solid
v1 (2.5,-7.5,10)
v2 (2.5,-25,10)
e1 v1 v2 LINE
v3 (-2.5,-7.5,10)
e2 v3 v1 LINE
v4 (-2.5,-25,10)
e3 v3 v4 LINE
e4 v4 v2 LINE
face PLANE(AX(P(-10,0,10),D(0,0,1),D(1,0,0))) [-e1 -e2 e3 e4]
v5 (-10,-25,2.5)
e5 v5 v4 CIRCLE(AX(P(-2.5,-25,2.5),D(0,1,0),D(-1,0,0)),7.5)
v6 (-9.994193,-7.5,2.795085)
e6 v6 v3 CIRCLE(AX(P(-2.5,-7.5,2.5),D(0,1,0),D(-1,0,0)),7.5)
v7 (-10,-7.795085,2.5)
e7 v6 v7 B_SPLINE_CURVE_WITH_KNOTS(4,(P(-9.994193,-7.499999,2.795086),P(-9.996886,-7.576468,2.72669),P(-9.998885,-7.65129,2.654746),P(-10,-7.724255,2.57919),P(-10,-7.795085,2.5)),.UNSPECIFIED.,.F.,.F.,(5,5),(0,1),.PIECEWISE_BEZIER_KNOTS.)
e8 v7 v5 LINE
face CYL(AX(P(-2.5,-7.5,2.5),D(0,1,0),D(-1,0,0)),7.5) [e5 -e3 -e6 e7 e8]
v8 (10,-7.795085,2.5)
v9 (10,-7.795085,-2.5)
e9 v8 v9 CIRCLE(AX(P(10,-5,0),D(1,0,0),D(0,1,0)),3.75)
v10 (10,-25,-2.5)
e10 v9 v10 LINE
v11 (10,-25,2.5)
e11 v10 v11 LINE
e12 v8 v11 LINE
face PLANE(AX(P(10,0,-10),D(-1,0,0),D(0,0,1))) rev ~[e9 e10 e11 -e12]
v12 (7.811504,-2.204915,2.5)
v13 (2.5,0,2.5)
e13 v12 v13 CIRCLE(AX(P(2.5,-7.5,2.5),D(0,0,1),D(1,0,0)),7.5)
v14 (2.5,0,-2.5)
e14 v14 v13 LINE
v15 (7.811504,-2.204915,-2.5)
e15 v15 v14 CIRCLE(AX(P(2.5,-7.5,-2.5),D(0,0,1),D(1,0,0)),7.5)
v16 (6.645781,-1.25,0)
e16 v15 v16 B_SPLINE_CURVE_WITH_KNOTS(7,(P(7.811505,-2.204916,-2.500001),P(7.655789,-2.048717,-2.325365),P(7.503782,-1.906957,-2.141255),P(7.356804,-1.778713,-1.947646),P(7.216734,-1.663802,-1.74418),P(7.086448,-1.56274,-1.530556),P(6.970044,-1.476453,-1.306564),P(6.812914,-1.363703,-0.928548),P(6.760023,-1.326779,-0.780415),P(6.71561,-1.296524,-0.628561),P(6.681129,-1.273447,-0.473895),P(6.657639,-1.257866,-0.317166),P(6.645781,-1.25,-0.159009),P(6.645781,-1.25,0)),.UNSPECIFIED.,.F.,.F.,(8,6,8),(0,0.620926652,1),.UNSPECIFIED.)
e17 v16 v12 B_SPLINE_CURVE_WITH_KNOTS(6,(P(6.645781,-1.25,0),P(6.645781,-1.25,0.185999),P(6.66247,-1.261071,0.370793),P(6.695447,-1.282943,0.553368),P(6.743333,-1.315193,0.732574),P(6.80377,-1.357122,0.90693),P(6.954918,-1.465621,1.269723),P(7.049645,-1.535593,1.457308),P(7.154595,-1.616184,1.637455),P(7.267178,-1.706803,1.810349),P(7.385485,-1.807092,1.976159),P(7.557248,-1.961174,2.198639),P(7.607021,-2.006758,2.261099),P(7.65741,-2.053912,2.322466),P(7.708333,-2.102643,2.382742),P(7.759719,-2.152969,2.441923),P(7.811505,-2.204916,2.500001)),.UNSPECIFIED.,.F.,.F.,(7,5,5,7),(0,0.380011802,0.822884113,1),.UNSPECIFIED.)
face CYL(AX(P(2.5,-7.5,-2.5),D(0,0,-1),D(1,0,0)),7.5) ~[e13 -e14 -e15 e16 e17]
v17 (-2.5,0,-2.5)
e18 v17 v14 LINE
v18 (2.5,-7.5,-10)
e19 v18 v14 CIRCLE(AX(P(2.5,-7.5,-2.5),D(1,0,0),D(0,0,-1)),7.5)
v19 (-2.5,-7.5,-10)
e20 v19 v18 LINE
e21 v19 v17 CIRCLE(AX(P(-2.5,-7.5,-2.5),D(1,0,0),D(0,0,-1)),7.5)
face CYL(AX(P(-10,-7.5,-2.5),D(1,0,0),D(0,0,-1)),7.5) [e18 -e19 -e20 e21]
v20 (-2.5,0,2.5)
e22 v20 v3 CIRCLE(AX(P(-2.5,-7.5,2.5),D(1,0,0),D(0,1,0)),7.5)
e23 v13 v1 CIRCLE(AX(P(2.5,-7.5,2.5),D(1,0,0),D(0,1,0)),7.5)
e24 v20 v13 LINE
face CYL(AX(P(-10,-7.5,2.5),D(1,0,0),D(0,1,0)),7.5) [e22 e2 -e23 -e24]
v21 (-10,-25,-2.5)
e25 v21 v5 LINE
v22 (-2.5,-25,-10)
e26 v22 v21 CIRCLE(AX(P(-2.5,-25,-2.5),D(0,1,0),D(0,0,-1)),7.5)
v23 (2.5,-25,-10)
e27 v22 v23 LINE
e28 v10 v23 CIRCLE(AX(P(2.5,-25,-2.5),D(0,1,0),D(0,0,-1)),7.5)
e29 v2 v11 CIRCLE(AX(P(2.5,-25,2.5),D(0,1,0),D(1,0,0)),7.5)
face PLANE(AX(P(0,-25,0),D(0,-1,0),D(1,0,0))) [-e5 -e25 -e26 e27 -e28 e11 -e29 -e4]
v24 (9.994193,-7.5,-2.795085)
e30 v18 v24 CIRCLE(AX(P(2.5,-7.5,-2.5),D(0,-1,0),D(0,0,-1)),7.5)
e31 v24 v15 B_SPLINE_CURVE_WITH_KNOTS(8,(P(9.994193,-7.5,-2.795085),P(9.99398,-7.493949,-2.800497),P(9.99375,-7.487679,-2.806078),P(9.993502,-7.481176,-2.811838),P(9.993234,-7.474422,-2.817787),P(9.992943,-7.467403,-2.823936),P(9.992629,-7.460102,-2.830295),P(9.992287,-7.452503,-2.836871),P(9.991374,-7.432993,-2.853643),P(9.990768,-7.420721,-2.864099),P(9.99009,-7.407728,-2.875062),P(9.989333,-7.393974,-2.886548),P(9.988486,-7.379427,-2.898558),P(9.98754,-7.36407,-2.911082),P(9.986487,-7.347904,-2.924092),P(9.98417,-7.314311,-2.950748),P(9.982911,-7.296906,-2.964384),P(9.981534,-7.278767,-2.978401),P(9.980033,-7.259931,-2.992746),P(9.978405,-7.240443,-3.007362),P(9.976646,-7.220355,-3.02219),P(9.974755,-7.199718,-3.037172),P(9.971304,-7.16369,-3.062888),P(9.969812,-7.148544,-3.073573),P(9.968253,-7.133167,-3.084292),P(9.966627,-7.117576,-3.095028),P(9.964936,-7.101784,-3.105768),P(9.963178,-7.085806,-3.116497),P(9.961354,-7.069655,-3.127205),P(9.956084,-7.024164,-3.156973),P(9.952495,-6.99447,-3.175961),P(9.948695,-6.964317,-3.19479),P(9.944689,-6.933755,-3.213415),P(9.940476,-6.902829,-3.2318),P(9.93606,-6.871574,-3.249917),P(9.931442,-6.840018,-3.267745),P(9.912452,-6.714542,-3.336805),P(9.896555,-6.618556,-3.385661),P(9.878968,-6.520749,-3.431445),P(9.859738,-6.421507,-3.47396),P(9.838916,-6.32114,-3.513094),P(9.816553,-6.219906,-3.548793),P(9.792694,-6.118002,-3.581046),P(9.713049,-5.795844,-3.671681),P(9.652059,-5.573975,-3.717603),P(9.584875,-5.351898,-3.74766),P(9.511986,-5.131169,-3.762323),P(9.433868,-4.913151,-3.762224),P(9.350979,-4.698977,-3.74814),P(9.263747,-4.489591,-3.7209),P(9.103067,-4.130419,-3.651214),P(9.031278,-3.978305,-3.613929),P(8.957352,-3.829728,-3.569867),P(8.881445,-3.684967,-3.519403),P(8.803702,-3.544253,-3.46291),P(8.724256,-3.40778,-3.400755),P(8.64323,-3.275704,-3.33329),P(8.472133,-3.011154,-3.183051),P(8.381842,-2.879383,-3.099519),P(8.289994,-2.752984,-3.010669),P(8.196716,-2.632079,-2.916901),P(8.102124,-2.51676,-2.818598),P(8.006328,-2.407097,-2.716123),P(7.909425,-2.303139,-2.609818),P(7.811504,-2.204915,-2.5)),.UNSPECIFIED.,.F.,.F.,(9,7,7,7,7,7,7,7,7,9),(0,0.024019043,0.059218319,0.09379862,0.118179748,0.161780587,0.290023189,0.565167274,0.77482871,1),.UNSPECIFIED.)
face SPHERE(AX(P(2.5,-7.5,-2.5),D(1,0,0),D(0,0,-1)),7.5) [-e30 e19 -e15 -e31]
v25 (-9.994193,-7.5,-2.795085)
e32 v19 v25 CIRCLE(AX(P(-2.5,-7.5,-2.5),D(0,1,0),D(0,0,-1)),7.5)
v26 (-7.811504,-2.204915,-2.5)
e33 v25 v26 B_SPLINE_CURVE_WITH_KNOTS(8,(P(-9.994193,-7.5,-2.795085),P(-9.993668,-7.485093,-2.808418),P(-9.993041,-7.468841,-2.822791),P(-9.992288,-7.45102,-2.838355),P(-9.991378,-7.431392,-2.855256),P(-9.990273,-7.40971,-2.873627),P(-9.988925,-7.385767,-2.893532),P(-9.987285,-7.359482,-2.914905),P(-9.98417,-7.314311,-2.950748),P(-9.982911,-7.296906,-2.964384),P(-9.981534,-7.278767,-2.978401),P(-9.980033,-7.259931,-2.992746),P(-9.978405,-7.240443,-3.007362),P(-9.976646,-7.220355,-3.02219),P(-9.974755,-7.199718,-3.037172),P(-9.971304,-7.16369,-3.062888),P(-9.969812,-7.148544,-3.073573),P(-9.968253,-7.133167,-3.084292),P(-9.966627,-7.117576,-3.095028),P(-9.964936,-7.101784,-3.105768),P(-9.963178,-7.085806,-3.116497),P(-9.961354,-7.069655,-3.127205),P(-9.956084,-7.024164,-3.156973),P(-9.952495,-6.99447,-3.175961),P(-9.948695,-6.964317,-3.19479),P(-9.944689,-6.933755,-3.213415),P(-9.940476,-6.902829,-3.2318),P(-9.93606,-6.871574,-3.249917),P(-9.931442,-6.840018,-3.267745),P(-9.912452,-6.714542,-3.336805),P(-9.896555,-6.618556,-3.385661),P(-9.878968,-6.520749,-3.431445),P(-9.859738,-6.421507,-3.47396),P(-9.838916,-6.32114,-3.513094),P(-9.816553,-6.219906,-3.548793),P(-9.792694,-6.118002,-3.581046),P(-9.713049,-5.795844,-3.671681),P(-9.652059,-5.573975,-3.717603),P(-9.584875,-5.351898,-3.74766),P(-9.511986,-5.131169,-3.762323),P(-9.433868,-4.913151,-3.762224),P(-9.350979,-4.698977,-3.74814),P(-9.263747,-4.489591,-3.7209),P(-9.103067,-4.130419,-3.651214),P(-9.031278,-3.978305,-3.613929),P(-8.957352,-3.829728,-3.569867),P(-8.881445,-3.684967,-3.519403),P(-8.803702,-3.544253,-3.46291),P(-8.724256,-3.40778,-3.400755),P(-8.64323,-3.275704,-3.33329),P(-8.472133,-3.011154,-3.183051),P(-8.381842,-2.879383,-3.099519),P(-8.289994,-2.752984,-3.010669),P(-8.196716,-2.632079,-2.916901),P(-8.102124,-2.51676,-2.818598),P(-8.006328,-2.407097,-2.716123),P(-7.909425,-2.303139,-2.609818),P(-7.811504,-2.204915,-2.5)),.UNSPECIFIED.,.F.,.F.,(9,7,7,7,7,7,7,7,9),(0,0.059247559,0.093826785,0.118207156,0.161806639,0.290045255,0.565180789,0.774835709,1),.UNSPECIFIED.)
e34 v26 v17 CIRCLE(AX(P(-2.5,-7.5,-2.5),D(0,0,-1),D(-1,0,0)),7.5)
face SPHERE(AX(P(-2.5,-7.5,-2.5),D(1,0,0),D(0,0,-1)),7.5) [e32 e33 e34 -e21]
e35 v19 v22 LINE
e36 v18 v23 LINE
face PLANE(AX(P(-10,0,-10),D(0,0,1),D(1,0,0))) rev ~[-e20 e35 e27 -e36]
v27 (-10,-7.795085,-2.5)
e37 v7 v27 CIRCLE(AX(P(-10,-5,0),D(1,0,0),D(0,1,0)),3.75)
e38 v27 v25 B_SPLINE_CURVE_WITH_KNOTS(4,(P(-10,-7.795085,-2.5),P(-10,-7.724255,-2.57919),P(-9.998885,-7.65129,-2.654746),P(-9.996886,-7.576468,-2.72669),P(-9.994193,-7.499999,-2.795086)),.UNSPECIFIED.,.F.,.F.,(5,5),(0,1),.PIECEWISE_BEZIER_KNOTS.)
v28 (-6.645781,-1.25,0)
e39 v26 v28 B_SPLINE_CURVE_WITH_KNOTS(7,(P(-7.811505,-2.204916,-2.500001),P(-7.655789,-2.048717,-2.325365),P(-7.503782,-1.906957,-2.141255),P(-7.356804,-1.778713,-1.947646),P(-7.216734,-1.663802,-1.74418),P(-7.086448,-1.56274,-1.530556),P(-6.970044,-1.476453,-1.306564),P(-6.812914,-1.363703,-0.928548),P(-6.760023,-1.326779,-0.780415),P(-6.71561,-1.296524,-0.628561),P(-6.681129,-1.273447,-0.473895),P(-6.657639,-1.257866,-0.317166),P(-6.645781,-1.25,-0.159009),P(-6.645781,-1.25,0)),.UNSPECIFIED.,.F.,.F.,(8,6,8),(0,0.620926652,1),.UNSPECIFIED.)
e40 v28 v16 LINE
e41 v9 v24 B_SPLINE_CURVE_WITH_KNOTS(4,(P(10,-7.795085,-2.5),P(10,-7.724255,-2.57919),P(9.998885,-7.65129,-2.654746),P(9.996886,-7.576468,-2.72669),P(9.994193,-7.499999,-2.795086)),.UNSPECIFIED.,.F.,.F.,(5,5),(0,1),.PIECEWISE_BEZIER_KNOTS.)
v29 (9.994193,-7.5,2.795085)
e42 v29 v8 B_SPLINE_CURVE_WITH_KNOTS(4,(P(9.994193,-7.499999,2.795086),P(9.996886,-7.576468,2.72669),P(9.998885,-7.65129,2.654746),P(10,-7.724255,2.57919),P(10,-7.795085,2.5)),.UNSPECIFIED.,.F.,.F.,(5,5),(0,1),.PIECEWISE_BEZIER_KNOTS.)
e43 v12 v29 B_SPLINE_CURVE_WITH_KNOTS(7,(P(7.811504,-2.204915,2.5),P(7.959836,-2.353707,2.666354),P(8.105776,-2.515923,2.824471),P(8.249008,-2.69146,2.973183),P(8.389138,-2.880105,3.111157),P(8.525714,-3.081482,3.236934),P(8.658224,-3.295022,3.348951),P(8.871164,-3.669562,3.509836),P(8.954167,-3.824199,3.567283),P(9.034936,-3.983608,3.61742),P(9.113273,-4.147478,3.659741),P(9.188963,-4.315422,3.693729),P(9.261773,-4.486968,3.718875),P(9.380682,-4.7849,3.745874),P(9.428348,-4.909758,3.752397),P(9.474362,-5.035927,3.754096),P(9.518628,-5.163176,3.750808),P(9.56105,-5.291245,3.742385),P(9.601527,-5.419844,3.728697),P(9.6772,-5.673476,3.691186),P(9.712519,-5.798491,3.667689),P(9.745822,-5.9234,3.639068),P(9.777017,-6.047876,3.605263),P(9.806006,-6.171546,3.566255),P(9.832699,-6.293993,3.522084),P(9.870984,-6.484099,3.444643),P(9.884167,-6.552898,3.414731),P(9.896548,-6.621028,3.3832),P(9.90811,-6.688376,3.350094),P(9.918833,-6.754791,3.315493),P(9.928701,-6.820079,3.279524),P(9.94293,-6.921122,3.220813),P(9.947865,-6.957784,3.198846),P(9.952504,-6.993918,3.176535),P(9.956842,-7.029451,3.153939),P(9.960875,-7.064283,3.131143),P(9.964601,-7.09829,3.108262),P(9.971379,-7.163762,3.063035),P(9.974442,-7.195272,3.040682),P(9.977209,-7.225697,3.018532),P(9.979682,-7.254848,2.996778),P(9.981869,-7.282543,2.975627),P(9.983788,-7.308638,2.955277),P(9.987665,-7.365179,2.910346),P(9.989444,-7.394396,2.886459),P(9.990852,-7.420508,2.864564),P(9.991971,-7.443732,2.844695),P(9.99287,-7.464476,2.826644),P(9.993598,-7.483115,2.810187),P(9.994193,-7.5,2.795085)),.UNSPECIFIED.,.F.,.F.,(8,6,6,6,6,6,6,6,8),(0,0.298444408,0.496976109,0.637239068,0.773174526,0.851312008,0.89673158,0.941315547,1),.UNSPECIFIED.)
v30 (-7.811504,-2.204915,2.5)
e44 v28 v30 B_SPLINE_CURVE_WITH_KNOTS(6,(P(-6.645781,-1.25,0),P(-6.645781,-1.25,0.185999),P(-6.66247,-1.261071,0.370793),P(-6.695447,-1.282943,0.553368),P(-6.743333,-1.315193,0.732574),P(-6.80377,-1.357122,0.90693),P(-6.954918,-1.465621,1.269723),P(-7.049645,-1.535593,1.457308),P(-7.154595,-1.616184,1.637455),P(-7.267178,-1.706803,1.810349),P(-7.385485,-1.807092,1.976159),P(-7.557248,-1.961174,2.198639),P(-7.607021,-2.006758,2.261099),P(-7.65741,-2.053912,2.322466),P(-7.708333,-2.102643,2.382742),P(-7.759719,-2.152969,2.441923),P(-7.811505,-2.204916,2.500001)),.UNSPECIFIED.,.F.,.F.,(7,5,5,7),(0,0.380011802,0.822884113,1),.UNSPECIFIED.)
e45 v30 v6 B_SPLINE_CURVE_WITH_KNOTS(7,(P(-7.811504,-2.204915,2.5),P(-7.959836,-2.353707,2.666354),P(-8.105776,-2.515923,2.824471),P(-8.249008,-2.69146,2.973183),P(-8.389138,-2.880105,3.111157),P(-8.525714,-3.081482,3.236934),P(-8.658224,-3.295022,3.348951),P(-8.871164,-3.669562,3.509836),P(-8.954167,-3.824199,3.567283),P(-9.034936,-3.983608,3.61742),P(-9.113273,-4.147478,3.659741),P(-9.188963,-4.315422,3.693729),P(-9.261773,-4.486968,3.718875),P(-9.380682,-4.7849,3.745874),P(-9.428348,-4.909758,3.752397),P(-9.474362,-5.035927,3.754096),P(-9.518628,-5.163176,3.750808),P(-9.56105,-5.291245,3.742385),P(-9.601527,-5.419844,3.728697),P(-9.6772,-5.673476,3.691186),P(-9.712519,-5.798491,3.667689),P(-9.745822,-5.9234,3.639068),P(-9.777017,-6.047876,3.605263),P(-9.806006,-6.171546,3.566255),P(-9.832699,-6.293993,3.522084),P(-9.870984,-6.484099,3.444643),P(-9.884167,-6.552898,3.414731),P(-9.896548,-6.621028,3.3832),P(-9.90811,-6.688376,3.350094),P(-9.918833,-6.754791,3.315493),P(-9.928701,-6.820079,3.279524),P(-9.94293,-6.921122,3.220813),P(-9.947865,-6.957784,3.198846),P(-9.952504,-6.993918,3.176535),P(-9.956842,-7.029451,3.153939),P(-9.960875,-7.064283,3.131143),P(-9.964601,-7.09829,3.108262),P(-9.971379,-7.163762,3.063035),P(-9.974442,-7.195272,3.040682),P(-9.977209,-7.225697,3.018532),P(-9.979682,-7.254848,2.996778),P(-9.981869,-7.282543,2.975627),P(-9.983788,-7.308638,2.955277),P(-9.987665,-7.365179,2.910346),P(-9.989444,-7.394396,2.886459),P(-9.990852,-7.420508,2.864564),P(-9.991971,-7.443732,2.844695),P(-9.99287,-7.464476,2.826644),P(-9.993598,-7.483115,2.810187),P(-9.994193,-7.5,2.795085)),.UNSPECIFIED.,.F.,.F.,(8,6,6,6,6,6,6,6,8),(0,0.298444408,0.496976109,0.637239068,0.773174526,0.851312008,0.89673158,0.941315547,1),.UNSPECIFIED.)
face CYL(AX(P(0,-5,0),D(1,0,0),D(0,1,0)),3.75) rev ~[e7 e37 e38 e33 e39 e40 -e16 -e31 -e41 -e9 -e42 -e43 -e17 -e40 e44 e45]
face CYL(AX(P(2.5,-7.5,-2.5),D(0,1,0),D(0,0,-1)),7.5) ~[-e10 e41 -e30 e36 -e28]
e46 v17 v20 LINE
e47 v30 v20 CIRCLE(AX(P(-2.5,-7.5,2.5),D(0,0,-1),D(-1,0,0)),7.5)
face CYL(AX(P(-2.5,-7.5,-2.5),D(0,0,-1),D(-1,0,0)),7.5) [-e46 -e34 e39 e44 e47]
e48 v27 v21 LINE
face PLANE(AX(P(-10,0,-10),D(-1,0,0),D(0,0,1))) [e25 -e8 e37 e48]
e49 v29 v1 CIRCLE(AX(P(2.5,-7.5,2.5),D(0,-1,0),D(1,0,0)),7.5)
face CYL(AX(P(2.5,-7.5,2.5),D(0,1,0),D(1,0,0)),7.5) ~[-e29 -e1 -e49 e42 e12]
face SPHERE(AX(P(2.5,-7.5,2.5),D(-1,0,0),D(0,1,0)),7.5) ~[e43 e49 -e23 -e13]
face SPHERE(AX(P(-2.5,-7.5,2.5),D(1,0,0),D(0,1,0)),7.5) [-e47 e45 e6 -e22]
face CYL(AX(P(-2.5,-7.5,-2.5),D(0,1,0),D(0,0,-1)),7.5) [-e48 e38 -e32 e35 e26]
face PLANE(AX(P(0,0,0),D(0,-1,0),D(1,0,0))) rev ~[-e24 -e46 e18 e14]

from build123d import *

# Parameters (mm, degrees)
F0_W         = 20
F0_H         = 20
F1_DEPTH     = 25
F2_R         = 3.75
F3_DEPTH     = 25
F4_R         = 7.5
F5_T1_DEPTH  = 36.25
F5_T3_DEPTH  = 5
F5_T6_ANGLE  = 90
F5_T8_ANGLE  = 90
F5_T10_ANGLE = 90
F5_T12_ANGLE = 90


# Not quite as in the source:
# - a fillet or chamfer that OpenCascade refuses, or shapes differently, is made with other operations: its cross-section is extruded or revolved along the edge and cut away or added


with BuildPart() as f1:
    # F0 (on Front) → F1 (new body)
    with BuildSketch(Plane.XZ):
        Rectangle(F0_W, F0_H)
    extrude(amount=F1_DEPTH)

    # F2 (on Right) → F3 (cut, symmetric)
    with BuildSketch(Plane.YZ):
        with Locations((-5, 0)):
            Circle(F2_R)
    extrude(amount=F3_DEPTH, both=True, mode=Mode.SUBTRACT)

    # F4
    f4_edges = [f1.edges().sort_by_distance(p)[0] for p in [
        (0, 0, 10),
        (0, 0, -10),
    ]]
    fillet(f4_edges, radius=F4_R)

    # F5: fillet of radius 7.5 on 8 edges, made by hand

    # F5_s2 → F5_t1 (cut)
    with BuildSketch(Plane.XZ.offset(7.5)):
        with BuildLine():
            ThreePointArc((-10, 2.5), (-7.8033008589, 7.8033008589), (-2.5, 10))
            Line((-2.5, 10), (-10, 10))
            Line((-10, 10), (-10, 2.5))
        make_face()
        with BuildLine():
            ThreePointArc((10, 2.5), (7.8033008589, 7.8033008589), (2.5, 10))
            Line((2.5, 10), (10, 10))
            Line((10, 10), (10, 2.5))
        make_face()
        with BuildLine():
            ThreePointArc((-2.5, -10), (-7.8033008589, -7.8033008589), (-10, -2.5))
            Line((-10, -2.5), (-10, -10))
            Line((-10, -10), (-2.5, -10))
        make_face()
        with BuildLine():
            ThreePointArc((2.5, -10), (7.8033008589, -7.8033008589), (10, -2.5))
            Line((10, -2.5), (10, -10))
            Line((10, -10), (2.5, -10))
        make_face()
    extrude(amount=F5_T1_DEPTH, mode=Mode.SUBTRACT)

    # F5_s4 → F5_t3 (cut)
    with BuildSketch(Plane.XY.offset(-2.5)):
        with BuildLine():
            ThreePointArc((10, -7.5), (7.8033008589, -2.1966991411), (2.5, 0))
            Line((2.5, 0), (10, 0))
            Line((10, 0), (10, -7.5))
        make_face()
        with BuildLine():
            ThreePointArc((-10, -7.5), (-7.8033008589, -2.1966991411), (-2.5, 0))
            Line((-2.5, 0), (-10, 0))
            Line((-10, 0), (-10, -7.5))
        make_face()
    extrude(amount=F5_T3_DEPTH, mode=Mode.SUBTRACT)

    # F5_s5 → F5_t6 (revolve, cut)
    with BuildSketch(Plane.XY.offset(2.5)):
        with BuildLine():
            ThreePointArc((-10, -7.5), (-7.8033008589, -2.1966991411), (-2.5, 0))
            Line((-2.5, 0), (-10, 0))
            Line((-10, 0), (-10, -7.5))
        make_face()
    revolve(axis=Axis((-10, -7.5, 2.5), (1, 0, 0)), revolution_arc=F5_T6_ANGLE, mode=Mode.SUBTRACT)

    # F5_s7 → F5_t8 (revolve, cut)
    with BuildSketch(Plane.XZ.offset(7.5)):
        with BuildLine():
            ThreePointArc((-10, -2.5), (-7.8033008589, -7.8033008589), (-2.5, -10))
            Line((-2.5, -10), (-10, -10))
            Line((-10, -10), (-10, -2.5))
        make_face()
    revolve(axis=Axis((-10, -7.5, -2.5), (1, 0, 0)), revolution_arc=F5_T8_ANGLE, mode=Mode.SUBTRACT)

    # F5_s9 → F5_t10 (revolve, cut)
    with BuildSketch(Plane.XZ.offset(7.5)):
        with BuildLine():
            ThreePointArc((2.5, -10), (7.8033008589, -7.8033008589), (10, -2.5))
            Line((10, -2.5), (10, -10))
            Line((10, -10), (2.5, -10))
        make_face()
    revolve(axis=Axis((10, -7.5, -2.5), (1, 0, 0)), revolution_arc=F5_T10_ANGLE, mode=Mode.SUBTRACT)

    # F5_s11 → F5_t12 (revolve, cut)
    with BuildSketch(Plane.XY.offset(2.5)):
        with BuildLine():
            ThreePointArc((10, -7.5), (7.8033008589, -2.1966991411), (2.5, 0))
            Line((2.5, 0), (10, 0))
            Line((10, 0), (10, -7.5))
        make_face()
    revolve(axis=Axis((10, -7.5, 2.5), (1, 0, 0)), revolution_arc=F5_T12_ANGLE, mode=Mode.SUBTRACT)


solid = f1.part
